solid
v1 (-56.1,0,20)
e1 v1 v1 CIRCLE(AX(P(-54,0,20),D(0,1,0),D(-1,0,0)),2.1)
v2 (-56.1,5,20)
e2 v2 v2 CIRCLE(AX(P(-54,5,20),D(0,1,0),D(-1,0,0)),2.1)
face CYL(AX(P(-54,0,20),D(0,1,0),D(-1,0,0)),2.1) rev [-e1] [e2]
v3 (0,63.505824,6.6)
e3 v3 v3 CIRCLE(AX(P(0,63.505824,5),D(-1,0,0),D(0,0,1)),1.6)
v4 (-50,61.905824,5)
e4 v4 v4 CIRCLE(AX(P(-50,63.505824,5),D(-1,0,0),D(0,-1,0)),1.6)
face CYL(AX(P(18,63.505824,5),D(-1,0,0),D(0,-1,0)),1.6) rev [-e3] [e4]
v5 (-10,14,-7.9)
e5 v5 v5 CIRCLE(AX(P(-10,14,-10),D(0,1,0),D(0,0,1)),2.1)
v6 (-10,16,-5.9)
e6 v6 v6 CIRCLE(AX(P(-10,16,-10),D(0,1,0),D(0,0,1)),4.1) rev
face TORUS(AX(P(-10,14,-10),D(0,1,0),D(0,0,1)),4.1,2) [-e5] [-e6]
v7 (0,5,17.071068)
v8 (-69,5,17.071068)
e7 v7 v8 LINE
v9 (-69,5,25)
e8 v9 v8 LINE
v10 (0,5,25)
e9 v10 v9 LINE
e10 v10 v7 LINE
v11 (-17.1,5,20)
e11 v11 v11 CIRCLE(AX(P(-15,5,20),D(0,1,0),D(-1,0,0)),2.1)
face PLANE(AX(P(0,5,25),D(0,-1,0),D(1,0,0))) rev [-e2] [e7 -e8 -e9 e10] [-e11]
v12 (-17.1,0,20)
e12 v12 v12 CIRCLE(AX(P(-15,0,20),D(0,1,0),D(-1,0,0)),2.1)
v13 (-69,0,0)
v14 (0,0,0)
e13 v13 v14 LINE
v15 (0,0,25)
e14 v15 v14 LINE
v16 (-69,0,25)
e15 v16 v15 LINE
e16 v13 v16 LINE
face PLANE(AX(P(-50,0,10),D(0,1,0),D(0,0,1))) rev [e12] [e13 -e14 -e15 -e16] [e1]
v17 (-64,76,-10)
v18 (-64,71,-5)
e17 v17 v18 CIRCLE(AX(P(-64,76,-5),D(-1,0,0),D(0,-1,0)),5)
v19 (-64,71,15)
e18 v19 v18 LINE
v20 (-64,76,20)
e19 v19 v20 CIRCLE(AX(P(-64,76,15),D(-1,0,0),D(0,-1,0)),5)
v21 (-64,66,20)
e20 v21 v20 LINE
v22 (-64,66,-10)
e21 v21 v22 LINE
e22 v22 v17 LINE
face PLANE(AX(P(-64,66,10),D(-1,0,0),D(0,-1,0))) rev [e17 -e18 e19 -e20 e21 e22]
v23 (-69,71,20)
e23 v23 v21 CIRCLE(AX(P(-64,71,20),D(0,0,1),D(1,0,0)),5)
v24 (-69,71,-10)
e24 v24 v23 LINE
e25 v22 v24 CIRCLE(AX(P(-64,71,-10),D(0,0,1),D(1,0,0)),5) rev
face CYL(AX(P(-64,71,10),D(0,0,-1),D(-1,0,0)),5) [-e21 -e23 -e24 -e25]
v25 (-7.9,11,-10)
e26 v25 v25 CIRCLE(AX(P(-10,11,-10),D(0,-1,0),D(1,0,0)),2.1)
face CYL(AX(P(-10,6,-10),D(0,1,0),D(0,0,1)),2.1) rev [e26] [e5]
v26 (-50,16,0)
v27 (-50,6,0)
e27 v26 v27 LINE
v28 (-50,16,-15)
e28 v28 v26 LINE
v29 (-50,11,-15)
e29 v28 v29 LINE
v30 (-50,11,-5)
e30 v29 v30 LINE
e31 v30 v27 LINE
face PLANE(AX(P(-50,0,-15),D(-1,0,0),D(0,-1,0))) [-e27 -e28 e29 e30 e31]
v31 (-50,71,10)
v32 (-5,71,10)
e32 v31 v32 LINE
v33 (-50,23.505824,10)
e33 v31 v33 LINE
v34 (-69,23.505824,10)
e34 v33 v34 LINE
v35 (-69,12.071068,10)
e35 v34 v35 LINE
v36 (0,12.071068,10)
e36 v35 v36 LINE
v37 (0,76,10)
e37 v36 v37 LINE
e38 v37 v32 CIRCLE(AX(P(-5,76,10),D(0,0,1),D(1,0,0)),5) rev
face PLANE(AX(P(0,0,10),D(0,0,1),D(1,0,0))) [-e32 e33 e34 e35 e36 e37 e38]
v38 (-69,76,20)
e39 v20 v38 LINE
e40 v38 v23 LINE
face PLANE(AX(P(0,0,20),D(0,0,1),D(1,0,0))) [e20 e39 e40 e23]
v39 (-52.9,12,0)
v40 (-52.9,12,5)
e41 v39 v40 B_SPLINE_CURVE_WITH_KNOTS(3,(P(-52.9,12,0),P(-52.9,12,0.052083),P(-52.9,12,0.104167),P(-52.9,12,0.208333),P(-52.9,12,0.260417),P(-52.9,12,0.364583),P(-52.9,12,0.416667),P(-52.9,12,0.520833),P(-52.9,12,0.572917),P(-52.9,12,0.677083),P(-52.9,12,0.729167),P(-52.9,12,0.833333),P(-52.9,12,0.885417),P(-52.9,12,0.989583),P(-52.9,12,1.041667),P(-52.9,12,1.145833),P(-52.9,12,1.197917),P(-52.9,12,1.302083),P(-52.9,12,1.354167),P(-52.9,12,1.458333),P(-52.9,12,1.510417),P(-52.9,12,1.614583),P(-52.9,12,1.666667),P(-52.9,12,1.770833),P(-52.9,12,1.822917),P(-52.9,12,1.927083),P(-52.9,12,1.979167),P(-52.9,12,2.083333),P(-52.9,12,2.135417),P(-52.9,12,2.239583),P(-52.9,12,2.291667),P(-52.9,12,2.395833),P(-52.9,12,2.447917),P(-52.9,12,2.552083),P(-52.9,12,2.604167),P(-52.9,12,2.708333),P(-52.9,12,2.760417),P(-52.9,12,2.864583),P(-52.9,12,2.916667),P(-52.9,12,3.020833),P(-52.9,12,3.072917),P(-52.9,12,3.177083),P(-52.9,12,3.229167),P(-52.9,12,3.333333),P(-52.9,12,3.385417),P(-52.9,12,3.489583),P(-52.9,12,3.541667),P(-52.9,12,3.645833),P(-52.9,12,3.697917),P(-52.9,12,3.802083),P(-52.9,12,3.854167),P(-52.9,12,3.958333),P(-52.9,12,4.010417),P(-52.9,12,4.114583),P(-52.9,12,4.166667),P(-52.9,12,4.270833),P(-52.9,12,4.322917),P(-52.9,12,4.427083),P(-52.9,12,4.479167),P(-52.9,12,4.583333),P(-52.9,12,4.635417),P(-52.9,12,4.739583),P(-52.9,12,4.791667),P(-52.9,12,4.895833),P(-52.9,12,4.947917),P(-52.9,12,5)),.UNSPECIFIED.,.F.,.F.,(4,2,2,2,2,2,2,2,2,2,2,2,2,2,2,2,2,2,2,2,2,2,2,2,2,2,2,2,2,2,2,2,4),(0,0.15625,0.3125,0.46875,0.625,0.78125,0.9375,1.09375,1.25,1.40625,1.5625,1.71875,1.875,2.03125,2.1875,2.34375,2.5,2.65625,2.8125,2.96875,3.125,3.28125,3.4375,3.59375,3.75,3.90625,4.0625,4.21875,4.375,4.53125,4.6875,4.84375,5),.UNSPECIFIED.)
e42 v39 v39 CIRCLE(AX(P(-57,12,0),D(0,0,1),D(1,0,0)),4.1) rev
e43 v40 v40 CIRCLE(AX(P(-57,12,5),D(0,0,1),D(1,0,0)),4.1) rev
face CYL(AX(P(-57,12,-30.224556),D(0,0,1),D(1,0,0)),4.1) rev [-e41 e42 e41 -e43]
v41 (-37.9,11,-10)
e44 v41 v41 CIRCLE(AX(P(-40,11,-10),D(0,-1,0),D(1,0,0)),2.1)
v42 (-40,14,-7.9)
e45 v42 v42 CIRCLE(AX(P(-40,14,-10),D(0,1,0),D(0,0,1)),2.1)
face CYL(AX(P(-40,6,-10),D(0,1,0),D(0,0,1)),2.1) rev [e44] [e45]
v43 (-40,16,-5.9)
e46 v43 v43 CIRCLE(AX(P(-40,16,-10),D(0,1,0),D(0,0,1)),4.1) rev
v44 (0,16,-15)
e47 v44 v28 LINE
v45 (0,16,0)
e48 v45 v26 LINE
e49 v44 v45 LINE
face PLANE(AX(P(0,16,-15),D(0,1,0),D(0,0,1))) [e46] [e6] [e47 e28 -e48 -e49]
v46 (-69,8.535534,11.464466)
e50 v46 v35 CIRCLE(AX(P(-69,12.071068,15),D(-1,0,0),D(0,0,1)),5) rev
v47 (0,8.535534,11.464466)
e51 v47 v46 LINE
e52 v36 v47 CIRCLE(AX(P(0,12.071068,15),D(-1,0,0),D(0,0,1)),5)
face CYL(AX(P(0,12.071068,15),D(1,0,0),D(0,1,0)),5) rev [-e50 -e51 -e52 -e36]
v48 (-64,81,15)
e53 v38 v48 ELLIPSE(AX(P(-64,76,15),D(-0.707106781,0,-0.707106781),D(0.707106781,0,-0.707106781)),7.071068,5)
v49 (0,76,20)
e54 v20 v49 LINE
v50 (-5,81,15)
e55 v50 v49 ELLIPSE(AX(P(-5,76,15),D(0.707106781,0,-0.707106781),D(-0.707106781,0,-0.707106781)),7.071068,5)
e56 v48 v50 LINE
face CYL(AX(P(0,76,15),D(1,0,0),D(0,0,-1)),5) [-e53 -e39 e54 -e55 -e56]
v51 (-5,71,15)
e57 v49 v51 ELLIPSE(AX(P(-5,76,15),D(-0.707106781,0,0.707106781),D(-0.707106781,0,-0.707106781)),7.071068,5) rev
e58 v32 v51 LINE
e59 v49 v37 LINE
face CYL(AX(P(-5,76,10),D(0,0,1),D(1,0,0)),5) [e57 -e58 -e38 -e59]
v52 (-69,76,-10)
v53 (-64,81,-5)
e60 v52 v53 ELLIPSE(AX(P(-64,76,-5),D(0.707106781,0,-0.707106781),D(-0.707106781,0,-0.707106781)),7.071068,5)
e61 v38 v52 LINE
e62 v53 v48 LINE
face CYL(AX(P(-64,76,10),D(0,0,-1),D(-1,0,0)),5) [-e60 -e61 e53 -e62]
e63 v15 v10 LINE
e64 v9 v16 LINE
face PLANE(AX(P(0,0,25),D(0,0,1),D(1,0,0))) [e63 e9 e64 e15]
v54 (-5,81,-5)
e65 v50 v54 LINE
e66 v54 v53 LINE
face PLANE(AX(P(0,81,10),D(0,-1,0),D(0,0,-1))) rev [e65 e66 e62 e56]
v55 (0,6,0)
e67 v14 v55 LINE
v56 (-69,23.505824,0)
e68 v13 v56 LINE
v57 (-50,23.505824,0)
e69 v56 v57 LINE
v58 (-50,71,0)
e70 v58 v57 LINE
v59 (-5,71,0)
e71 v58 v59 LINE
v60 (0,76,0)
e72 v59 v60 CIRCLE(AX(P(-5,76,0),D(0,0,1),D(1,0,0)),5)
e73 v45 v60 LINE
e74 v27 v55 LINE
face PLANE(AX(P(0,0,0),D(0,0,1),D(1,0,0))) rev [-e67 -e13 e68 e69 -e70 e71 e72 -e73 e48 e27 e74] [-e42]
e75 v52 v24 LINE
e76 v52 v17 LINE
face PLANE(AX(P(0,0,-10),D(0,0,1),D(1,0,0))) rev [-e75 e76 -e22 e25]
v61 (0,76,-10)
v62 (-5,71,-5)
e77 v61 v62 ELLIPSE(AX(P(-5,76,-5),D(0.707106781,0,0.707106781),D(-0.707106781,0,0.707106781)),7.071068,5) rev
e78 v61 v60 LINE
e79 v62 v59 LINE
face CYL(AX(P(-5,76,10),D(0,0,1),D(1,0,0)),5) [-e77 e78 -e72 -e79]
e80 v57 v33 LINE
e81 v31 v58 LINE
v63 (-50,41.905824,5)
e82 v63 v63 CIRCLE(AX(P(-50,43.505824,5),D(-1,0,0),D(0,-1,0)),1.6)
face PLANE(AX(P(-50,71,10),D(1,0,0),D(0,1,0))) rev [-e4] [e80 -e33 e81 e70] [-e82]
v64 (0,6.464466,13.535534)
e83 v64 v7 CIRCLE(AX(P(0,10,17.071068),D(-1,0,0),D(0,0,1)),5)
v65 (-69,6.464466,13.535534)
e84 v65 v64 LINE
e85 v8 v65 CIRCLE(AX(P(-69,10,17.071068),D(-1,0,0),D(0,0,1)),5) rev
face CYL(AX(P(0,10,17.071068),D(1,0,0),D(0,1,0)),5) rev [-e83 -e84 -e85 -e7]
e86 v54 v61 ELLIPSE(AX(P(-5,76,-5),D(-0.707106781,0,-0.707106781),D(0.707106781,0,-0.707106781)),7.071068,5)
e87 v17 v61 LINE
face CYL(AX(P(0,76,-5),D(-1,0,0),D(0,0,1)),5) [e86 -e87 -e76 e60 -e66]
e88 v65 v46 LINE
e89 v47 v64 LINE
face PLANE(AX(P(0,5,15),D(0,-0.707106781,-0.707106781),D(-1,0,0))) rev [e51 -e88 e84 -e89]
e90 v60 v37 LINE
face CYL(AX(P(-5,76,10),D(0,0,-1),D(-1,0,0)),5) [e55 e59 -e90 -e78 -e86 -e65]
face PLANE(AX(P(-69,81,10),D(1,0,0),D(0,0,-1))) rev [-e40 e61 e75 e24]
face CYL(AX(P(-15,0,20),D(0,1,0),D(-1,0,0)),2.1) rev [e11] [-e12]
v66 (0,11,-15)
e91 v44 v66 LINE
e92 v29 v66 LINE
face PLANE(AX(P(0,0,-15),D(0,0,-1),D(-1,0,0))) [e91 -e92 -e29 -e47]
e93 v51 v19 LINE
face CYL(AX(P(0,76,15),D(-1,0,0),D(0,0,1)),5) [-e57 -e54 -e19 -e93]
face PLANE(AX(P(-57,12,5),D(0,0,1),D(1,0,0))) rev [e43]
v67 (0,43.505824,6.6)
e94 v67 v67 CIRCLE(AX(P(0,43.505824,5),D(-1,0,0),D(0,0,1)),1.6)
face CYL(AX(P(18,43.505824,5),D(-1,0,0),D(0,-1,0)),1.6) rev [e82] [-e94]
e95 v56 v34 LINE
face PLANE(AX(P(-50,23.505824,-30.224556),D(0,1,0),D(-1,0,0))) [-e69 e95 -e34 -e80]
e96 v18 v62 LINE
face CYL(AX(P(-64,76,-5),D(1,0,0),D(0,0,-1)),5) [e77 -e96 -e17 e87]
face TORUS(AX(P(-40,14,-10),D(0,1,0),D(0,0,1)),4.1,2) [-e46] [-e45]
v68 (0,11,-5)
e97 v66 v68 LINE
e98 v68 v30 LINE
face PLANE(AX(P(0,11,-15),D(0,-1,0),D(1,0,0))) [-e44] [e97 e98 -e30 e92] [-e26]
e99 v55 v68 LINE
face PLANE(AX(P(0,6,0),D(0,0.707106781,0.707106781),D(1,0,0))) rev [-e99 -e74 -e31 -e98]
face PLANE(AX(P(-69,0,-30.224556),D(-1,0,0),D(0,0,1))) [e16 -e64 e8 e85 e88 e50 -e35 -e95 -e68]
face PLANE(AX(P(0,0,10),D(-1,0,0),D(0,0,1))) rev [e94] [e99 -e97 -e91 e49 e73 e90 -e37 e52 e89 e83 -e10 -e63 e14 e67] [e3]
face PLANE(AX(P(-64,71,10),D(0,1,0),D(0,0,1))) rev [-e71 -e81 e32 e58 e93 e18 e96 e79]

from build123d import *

# Parameters (mm, degrees)
BOSS_EXTRU_1_DEPTH      = 10
BOSS_EXTRU_2_DEPTH      = 10
BOSS_EXTRU_2_DEPTH_BACK = 20
ESQUISSE2_W             = 69
ESQUISSE2_H             = 10
ESQUISSE4_W             = 19
ESQUISSE4_H             = 23.50582434
ESQUISSE4_R             = 4.1
BOSS_EXTRU_3_DEPTH      = 10
ESQUISSE5_W             = 5
ESQUISSE5_H             = 30
BOSS_EXTRU_4_DEPTH      = 5
ESQUISSE6_W             = 69
ESQUISSE6_H             = 5
BOSS_EXTRU_5_DEPTH      = 15
ESQUISSE7_R             = 5.448918283
BOSS_EXTRU_6_DEPTH      = 5
CHANFREIN2_SIZE         = 5
ESQUISSE8_R             = 2.1
ENL_V_MAT_EXTRU_1_DEPTH = 5
ESQUISSE9_R             = 1.6
ENL_V_MAT_EXTRU_2_DEPTH = 68
ESQUISSE10_W            = 50
ESQUISSE10_H            = 5
BOSS_EXTRU_7_DEPTH      = 15
CHANFREIN3_SIZE         = 5
ESQUISSE11_R            = 2.1
ENL_V_MAT_EXTRU_3_DEPTH = 10
CONG_1_R                = 2
CONG_2_R                = 5


with BuildPart() as part:
    # Esquisse1 → Boss.-Extru.1 (new body)
    with BuildSketch(Plane.XY):
        Polygon((0, 0), (0, 81), (-69, 81), (-69, 66), (-64, 66), (-64, 71), (-50, 71), (-50, 0), align=None)
    extrude(amount=BOSS_EXTRU_1_DEPTH)

    # Esquisse2 → Boss.-Extru.2 (add, two sides: drawn at the far end of the back side and taken through both)
    with BuildSketch(Plane.XY.offset(10).offset(-BOSS_EXTRU_2_DEPTH_BACK)):
        with Locations((-34.5, 76)):
            Rectangle(ESQUISSE2_W, ESQUISSE2_H)
    extrude(amount=BOSS_EXTRU_2_DEPTH + BOSS_EXTRU_2_DEPTH_BACK)

    # Esquisse4 → Boss.-Extru.3 (add)
    with BuildSketch(Plane.XY.offset(10)):
        with Locations((-59.5, 11.75291217)):
            Rectangle(ESQUISSE4_W, ESQUISSE4_H)
        with Locations((-57, 12)):
            Circle(ESQUISSE4_R, mode=Mode.SUBTRACT)
    extrude(amount=-BOSS_EXTRU_3_DEPTH)

    # Esquisse5 → Boss.-Extru.4 (add)
    with BuildSketch(Plane.XZ.offset(-71)):
        with Locations((-66.5, 5)):
            Rectangle(ESQUISSE5_W, ESQUISSE5_H)
    extrude(amount=BOSS_EXTRU_4_DEPTH)

    # Esquisse6 → Boss.-Extru.5 (add)
    with BuildSketch(Plane.XY.offset(10)):
        with Locations((-34.5, 2.5)):
            Rectangle(ESQUISSE6_W, ESQUISSE6_H)
    extrude(amount=BOSS_EXTRU_5_DEPTH)

    # Esquisse7 → Boss.-Extru.6 (add)
    with BuildSketch(Plane.XY.offset(10)):
        with Locations((-57, 12)):
            Circle(ESQUISSE7_R)
    extrude(amount=-BOSS_EXTRU_6_DEPTH)

    # Chanfrein2
    chanfrein2_edges = [part.edges().sort_by_distance(p)[0] for p in [
        (-34.5, 5, 10),
    ]]
    chamfer(chanfrein2_edges, length=CHANFREIN2_SIZE)

    # Esquisse8 → Enlèv. mat.-Extru.1 (cut)
    with BuildSketch(Plane(origin=(0, 5, 0), x_dir=(1, 0, 0), z_dir=(0, 1, 0))):
        with Locations(Location((-15, -20, 0), (0, 0, 180))):
            Circle(ESQUISSE8_R)
        with Locations(Location((-54, -20, 0), (0, 0, 180))):
            Circle(ESQUISSE8_R)
    extrude(amount=-ENL_V_MAT_EXTRU_1_DEPTH, mode=Mode.SUBTRACT)

    # Esquisse9 → Enlèv. mat.-Extru.2 (cut)
    with BuildSketch(Plane.ZY.offset(50)):
        with Locations(Location((5, 63.50582434, 0), (0, 0, 270))):
            Circle(ESQUISSE9_R)
        with Locations(Location((5, 43.50582434, 0), (0, 0, 270))):
            Circle(ESQUISSE9_R)
    extrude(amount=-ENL_V_MAT_EXTRU_2_DEPTH, mode=Mode.SUBTRACT)

    # Esquisse10 → Boss.-Extru.7 (add)
    with BuildSketch(Plane(origin=(0, 0, 0), x_dir=(-1, 0, 0), z_dir=(0, 0, -1))):
        with Locations((25, 13.5)):
            Rectangle(ESQUISSE10_W, ESQUISSE10_H)
    extrude(amount=BOSS_EXTRU_7_DEPTH)

    # Chanfrein3
    chanfrein3_edges = [part.edges().sort_by_distance(p)[0] for p in [
        (-25, 11, 0),
    ]]
    chamfer(chanfrein3_edges, length=CHANFREIN3_SIZE)

    # Esquisse11 → Enlèv. mat.-Extru.3 (cut)
    with BuildSketch(Plane(origin=(0, 16, 0), x_dir=(1, 0, 0), z_dir=(0, 1, 0))):
        with Locations(Location((-10, 10, 0), (0, 0, 270))):
            Circle(ESQUISSE11_R)
        with Locations(Location((-40, 10, 0), (0, 0, 270))):
            Circle(ESQUISSE11_R)
    extrude(amount=-ENL_V_MAT_EXTRU_3_DEPTH, mode=Mode.SUBTRACT)

    # Congé1
    cong_1_edges = [part.edges().sort_by_distance(p)[0] for p in [
        (-10, 16, -12.1),
        (-40, 16, -12.1),
    ]]
    fillet(cong_1_edges, radius=CONG_1_R)

    # Congé2
    cong_2_edges = [part.edges().sort_by_distance(p)[0] for p in [
        (-34.5, 10, 10),
        (-34.5, 5, 15),
        (-32, 71, -10),
        (0, 71, -5),
        (0, 71, 15),
        (-32, 71, 20),
        (-34.5, 81, 20),
        (-34.5, 81, -10),
        (0, 81, 5),
        (-69, 81, 5),
        (-69, 66, 5),
    ]]
    fillet(cong_2_edges, radius=CONG_2_R - 0.0001)  # a hair under: the kernel refuses the full size


solid = part.part
